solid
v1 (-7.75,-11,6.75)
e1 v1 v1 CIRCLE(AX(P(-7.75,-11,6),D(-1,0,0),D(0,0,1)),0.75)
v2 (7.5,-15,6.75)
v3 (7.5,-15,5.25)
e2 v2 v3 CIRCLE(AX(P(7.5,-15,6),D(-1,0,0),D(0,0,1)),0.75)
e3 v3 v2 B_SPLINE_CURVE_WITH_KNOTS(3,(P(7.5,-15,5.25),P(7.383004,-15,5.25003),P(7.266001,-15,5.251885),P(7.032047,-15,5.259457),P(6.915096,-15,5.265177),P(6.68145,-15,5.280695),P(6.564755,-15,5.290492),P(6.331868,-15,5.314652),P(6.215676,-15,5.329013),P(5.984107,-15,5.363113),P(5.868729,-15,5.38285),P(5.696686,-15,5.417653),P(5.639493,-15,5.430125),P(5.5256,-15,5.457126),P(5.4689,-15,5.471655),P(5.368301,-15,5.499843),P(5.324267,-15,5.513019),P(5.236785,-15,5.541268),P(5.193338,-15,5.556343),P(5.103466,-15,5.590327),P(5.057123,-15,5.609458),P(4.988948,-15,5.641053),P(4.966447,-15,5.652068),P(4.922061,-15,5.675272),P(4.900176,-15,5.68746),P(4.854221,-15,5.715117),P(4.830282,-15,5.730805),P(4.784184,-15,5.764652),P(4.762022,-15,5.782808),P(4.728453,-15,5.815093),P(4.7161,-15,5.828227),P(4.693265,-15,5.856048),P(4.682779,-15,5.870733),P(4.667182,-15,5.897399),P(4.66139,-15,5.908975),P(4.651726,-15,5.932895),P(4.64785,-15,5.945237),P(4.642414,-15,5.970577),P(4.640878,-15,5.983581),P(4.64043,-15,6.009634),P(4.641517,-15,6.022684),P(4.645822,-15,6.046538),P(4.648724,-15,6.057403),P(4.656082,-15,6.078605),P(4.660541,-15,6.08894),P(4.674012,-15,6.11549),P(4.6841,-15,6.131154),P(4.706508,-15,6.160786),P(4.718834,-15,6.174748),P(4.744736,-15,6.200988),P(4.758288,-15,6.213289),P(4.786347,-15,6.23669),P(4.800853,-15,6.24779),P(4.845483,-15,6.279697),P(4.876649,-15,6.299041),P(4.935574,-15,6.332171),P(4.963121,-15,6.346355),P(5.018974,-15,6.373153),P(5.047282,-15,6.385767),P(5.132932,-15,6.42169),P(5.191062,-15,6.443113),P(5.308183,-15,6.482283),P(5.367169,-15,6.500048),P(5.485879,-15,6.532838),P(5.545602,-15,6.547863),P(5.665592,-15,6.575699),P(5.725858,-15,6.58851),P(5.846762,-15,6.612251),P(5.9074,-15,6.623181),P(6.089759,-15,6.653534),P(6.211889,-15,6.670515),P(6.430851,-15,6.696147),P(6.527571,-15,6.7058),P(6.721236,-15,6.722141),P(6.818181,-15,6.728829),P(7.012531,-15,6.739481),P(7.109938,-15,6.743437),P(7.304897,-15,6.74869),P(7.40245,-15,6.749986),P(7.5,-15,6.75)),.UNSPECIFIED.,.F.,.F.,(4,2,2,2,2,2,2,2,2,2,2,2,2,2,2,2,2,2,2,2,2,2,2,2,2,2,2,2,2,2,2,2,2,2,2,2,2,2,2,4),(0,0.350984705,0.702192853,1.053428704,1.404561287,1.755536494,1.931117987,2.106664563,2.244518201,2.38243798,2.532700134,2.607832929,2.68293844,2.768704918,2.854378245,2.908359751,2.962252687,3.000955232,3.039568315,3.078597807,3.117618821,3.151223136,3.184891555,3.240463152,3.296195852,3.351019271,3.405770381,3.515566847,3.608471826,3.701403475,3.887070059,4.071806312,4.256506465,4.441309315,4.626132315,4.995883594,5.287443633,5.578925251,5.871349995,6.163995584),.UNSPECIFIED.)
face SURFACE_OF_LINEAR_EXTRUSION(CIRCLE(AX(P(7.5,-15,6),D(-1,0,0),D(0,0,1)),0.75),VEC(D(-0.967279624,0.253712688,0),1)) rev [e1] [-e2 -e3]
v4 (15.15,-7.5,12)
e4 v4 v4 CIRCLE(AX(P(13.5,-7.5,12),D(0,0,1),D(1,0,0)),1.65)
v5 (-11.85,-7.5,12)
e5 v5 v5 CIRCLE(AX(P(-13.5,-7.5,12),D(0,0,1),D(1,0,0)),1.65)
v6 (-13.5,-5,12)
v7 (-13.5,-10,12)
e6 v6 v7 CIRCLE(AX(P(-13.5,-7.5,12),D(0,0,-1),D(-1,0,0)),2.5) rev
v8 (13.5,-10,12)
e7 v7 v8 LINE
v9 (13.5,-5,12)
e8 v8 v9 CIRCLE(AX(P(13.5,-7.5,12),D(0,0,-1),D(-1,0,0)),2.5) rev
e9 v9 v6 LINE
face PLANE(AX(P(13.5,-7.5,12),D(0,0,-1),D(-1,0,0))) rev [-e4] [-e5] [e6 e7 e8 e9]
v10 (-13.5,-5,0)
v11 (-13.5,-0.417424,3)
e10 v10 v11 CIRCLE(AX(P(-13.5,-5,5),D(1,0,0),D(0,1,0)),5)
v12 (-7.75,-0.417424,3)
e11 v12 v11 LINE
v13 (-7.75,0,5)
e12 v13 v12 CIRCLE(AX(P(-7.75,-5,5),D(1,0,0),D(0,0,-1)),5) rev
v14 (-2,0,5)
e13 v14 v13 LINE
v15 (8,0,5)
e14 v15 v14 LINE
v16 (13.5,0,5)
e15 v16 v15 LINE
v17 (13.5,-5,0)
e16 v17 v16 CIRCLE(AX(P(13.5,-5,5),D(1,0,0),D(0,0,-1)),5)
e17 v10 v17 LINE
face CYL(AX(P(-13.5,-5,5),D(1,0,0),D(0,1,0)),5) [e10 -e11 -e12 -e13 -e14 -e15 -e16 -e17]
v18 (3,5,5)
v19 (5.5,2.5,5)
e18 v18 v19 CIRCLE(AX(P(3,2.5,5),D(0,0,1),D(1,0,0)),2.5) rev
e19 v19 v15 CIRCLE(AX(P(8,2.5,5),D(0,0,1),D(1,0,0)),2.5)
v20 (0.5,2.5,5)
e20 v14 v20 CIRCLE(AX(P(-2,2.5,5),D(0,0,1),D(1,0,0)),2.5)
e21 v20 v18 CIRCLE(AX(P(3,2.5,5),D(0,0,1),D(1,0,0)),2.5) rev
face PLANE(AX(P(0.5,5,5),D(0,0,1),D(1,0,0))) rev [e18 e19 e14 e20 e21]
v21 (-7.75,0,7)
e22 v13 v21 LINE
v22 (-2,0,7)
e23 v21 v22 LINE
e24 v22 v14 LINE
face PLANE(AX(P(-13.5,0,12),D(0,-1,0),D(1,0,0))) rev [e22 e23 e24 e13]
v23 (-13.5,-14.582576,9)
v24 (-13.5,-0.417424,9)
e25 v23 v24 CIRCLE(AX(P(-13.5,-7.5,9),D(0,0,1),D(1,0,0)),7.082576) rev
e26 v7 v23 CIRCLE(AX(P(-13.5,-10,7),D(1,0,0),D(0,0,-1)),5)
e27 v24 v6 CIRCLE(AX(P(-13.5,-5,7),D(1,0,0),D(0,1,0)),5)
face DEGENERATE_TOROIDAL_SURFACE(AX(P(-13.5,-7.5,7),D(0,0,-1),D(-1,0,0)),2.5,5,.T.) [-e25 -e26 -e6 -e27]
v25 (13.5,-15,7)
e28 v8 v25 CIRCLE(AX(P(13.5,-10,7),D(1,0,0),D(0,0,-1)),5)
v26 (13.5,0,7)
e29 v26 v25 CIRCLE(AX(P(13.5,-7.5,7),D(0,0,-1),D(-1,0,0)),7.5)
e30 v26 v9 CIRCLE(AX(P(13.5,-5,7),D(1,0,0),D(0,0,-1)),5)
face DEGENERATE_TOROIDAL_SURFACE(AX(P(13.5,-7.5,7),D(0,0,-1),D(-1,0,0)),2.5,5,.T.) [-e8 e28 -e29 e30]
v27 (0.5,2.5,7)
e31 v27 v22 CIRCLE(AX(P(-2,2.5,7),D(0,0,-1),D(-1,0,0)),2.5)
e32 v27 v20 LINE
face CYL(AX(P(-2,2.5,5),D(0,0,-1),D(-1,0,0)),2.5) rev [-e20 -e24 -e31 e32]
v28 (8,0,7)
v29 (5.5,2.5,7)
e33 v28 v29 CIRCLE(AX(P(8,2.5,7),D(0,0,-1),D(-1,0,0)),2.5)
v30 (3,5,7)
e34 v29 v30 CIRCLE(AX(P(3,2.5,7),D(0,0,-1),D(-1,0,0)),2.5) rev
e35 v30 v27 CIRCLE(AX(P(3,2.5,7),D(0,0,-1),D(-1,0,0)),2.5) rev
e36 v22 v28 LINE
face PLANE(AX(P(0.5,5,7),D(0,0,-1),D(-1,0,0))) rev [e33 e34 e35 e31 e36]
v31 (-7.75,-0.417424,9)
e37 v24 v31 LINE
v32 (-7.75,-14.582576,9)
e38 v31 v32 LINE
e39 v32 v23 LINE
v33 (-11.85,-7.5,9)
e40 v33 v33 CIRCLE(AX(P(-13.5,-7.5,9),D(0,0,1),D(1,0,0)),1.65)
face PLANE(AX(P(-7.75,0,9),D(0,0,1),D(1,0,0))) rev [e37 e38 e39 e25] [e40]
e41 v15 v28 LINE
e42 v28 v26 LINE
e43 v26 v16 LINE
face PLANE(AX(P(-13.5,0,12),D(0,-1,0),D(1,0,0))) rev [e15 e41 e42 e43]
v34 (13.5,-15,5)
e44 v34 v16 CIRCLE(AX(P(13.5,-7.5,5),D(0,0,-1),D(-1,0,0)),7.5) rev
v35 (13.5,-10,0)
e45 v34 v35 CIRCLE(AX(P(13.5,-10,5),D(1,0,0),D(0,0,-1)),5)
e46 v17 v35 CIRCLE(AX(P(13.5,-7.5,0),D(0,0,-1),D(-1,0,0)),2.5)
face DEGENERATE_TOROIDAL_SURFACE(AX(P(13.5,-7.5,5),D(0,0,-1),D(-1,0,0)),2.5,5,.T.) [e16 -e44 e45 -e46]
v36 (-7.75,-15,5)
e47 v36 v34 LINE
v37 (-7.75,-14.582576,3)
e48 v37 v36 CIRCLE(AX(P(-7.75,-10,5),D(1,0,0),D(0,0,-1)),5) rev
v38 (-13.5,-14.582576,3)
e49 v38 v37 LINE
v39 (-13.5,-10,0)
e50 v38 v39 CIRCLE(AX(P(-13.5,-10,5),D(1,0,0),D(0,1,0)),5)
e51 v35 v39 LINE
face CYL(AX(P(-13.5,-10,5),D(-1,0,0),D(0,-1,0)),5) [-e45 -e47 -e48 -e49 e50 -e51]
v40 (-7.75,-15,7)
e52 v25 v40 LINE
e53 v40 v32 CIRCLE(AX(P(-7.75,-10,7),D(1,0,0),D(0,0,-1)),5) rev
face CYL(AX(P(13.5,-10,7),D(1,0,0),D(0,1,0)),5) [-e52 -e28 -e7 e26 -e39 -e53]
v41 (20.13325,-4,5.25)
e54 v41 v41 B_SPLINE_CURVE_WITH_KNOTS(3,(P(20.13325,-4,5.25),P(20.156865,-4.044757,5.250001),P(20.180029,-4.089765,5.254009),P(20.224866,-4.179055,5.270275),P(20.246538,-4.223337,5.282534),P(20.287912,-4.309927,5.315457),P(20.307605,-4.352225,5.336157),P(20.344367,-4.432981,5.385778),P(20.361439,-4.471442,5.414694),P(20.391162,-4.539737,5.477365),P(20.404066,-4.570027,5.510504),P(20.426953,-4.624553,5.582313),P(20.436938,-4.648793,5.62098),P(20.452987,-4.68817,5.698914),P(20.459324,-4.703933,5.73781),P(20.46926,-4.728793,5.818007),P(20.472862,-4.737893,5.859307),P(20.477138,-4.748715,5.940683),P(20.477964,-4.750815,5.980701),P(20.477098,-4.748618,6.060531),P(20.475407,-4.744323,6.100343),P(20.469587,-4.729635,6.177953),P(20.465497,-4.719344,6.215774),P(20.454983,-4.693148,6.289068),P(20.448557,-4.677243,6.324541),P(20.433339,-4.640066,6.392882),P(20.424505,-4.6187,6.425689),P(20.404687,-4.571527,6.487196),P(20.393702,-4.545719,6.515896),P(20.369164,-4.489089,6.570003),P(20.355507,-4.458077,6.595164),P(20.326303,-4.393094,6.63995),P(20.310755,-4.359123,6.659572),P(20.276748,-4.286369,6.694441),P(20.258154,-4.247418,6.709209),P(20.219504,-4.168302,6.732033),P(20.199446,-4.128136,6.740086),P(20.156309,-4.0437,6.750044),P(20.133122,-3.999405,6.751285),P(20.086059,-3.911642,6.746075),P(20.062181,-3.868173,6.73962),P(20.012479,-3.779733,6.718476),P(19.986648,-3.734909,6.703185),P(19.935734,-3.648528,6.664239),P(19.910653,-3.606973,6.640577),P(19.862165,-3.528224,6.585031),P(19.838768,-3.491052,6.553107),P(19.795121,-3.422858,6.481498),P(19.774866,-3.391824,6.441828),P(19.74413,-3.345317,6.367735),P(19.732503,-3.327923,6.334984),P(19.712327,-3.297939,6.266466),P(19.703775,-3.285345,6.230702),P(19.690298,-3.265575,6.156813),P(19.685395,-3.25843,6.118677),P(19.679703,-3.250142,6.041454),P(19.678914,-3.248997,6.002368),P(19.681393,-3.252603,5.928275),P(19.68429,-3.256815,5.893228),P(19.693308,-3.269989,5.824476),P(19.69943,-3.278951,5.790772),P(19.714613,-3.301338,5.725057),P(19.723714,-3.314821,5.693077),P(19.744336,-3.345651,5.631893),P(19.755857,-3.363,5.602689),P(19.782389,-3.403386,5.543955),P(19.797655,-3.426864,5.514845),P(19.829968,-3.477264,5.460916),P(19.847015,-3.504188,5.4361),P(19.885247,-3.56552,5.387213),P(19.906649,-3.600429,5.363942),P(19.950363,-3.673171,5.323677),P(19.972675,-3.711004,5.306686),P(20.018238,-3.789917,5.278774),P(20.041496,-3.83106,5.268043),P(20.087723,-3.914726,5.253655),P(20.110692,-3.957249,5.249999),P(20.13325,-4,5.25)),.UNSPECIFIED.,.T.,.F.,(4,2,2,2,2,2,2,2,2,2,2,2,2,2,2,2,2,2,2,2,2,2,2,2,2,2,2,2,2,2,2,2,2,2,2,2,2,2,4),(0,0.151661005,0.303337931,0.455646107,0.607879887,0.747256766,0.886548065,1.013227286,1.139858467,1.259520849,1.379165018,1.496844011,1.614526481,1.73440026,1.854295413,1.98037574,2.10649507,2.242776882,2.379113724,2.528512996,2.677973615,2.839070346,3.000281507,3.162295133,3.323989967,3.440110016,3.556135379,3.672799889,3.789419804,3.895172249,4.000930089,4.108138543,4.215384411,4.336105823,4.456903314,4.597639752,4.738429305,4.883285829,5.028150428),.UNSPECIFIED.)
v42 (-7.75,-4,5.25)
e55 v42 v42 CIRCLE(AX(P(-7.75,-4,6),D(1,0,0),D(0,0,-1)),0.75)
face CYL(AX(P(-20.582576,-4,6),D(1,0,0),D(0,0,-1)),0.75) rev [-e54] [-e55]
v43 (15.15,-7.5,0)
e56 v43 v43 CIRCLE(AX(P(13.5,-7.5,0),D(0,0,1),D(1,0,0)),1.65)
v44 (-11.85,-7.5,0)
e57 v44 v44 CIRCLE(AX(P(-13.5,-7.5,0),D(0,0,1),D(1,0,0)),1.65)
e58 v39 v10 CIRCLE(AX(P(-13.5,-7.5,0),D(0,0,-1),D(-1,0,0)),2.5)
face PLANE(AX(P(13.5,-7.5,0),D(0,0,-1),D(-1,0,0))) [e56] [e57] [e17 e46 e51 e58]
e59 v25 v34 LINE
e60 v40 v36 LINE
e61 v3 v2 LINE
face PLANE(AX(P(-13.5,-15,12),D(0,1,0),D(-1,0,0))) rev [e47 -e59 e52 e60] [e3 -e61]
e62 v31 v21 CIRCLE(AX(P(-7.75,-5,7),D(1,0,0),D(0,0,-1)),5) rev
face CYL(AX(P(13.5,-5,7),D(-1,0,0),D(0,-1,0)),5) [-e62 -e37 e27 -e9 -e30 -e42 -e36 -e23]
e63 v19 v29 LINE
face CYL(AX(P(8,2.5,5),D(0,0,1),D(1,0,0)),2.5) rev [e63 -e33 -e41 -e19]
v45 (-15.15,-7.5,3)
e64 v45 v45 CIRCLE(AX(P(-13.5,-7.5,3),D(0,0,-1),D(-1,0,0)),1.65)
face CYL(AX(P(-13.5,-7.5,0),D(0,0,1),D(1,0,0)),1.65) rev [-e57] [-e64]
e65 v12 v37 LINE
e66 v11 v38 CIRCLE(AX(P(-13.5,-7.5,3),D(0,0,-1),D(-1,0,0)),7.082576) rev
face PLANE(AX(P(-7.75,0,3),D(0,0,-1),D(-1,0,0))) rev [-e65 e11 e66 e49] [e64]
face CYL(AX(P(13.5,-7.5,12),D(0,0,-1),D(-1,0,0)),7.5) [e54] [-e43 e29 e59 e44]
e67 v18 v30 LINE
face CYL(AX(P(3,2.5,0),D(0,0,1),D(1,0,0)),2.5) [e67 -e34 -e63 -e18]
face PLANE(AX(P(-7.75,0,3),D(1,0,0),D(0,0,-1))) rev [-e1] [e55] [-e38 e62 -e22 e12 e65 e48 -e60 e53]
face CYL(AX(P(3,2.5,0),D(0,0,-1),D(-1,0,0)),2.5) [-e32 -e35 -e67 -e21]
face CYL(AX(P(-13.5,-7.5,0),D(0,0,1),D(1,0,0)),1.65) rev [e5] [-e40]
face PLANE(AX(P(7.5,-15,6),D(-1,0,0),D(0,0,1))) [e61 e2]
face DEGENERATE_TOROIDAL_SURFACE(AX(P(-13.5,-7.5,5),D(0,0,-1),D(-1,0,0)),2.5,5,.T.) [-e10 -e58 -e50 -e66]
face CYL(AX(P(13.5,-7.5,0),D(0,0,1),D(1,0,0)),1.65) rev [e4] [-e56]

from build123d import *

# Parameters (mm, degrees)
BOSS_EXTRUDE1_DEPTH = 12
FILLET1_R           = 5
SKETCH5_W           = 13.25
SKETCH5_H           = 6
CUT_EXTRUDE3_DEPTH  = 35.785054262
SKETCH6_W           = 5
SKETCH6_H           = 2
BOSS_EXTRUDE2_DEPTH = 5
FILLET2_R           = 2.5
FILLET3_R           = 2.5
SKETCH3_R           = 1.65
CUT_EXTRUDE4_DEPTH  = 29.460498984
SKETCH8_R           = 0.75
CUT_EXTRUDE7_DEPTH  = 46.805137399
SKETCH9_R           = 0.75
CUT_EXTRUDE9_DEPTH  = 15.765865025


with BuildPart() as part:
    # Sketch2 → Boss-Extrude1 (new body)
    with BuildSketch(Plane.XY):
        with BuildLine():
            Line((-13.5, 0), (13.5, 0))
            ThreePointArc((13.5, 0), (21, -7.5), (13.5, -15))
            Line((13.5, -15), (-13.5, -15))
            ThreePointArc((-13.5, -15), (-21, -7.5), (-13.5, 0))
        make_face()
    extrude(amount=BOSS_EXTRUDE1_DEPTH)

    # Fillet1
    fillet1_edges = [part.edges().sort_by_distance(p)[0] for p in [
        (-21, -7.5, 12),
        (0, -15, 12),
        (21, -7.5, 12),
        (0, -15, 0),
        (-21, -7.5, 0),
        (0, 0, 0),
        (21, -7.5, 0),
        (0, 0, 12),
    ]]
    fillet(fillet1_edges, radius=FILLET1_R)

    # Sketch5 → Cut-Extrude3 (cut, through all)
    with BuildSketch(Plane(origin=(0, -25, 0), x_dir=(-1, 0, 0), z_dir=(0, -1, 0))):
        with Locations((14.375, -6)):
            Rectangle(SKETCH5_W, SKETCH5_H)
    extrude(amount=-CUT_EXTRUDE3_DEPTH, mode=Mode.SUBTRACT)

    # Sketch6 → Boss-Extrude2 (add)
    with BuildSketch(Plane(origin=(0, 0, 0), x_dir=(1, 0, 0), z_dir=(0, 1, 0))):
        with Locations((3, -6)):
            Rectangle(SKETCH6_W, SKETCH6_H)
    extrude(amount=BOSS_EXTRUDE2_DEPTH)

    # Fillet2
    fillet2_edges = [part.edges().sort_by_distance(p)[0] for p in [
        (5.5, 5, 6),
        (0.5, 5, 6),
    ]]
    fillet(fillet2_edges, radius=FILLET2_R - 0.0001)  # a hair under: the kernel refuses the full size

    # Fillet3
    fillet3_edges = [part.edges().sort_by_distance(p)[0] for p in [
        (0.5, 0, 6),
        (5.5, 0, 6),
    ]]
    fillet(fillet3_edges, radius=FILLET3_R)

    # Sketch3 → Cut-Extrude4 (cut, through all)
    with BuildSketch(Plane.XY.offset(12)):
        with Locations((-13.5, -7.5)):
            Circle(SKETCH3_R)
        with Locations((13.5, -7.5)):
            Circle(SKETCH3_R)
    extrude(amount=-CUT_EXTRUDE4_DEPTH, mode=Mode.SUBTRACT)

    # Sketch8 → Cut-Extrude7 (cut, through all)
    with BuildSketch(Plane(origin=(21, 0, 0), x_dir=(0, 0, -1), z_dir=(1, 0, 0))):
        with Locations((-6, -4)):
            Circle(SKETCH8_R)
    extrude(amount=-CUT_EXTRUDE7_DEPTH, mode=Mode.SUBTRACT)

    # Sketch9 → Cut-Extrude9 (cut, along a direction that is not the sketch's normal)
    with BuildSketch(Plane.ZY.offset(7.75)):
        with Locations((6, -11)):
            Circle(SKETCH9_R)
    extrude(amount=-CUT_EXTRUDE9_DEPTH, dir=(-0.9672796243913314, 0.25371268836493915, 0), mode=Mode.SUBTRACT)


solid = part.part
